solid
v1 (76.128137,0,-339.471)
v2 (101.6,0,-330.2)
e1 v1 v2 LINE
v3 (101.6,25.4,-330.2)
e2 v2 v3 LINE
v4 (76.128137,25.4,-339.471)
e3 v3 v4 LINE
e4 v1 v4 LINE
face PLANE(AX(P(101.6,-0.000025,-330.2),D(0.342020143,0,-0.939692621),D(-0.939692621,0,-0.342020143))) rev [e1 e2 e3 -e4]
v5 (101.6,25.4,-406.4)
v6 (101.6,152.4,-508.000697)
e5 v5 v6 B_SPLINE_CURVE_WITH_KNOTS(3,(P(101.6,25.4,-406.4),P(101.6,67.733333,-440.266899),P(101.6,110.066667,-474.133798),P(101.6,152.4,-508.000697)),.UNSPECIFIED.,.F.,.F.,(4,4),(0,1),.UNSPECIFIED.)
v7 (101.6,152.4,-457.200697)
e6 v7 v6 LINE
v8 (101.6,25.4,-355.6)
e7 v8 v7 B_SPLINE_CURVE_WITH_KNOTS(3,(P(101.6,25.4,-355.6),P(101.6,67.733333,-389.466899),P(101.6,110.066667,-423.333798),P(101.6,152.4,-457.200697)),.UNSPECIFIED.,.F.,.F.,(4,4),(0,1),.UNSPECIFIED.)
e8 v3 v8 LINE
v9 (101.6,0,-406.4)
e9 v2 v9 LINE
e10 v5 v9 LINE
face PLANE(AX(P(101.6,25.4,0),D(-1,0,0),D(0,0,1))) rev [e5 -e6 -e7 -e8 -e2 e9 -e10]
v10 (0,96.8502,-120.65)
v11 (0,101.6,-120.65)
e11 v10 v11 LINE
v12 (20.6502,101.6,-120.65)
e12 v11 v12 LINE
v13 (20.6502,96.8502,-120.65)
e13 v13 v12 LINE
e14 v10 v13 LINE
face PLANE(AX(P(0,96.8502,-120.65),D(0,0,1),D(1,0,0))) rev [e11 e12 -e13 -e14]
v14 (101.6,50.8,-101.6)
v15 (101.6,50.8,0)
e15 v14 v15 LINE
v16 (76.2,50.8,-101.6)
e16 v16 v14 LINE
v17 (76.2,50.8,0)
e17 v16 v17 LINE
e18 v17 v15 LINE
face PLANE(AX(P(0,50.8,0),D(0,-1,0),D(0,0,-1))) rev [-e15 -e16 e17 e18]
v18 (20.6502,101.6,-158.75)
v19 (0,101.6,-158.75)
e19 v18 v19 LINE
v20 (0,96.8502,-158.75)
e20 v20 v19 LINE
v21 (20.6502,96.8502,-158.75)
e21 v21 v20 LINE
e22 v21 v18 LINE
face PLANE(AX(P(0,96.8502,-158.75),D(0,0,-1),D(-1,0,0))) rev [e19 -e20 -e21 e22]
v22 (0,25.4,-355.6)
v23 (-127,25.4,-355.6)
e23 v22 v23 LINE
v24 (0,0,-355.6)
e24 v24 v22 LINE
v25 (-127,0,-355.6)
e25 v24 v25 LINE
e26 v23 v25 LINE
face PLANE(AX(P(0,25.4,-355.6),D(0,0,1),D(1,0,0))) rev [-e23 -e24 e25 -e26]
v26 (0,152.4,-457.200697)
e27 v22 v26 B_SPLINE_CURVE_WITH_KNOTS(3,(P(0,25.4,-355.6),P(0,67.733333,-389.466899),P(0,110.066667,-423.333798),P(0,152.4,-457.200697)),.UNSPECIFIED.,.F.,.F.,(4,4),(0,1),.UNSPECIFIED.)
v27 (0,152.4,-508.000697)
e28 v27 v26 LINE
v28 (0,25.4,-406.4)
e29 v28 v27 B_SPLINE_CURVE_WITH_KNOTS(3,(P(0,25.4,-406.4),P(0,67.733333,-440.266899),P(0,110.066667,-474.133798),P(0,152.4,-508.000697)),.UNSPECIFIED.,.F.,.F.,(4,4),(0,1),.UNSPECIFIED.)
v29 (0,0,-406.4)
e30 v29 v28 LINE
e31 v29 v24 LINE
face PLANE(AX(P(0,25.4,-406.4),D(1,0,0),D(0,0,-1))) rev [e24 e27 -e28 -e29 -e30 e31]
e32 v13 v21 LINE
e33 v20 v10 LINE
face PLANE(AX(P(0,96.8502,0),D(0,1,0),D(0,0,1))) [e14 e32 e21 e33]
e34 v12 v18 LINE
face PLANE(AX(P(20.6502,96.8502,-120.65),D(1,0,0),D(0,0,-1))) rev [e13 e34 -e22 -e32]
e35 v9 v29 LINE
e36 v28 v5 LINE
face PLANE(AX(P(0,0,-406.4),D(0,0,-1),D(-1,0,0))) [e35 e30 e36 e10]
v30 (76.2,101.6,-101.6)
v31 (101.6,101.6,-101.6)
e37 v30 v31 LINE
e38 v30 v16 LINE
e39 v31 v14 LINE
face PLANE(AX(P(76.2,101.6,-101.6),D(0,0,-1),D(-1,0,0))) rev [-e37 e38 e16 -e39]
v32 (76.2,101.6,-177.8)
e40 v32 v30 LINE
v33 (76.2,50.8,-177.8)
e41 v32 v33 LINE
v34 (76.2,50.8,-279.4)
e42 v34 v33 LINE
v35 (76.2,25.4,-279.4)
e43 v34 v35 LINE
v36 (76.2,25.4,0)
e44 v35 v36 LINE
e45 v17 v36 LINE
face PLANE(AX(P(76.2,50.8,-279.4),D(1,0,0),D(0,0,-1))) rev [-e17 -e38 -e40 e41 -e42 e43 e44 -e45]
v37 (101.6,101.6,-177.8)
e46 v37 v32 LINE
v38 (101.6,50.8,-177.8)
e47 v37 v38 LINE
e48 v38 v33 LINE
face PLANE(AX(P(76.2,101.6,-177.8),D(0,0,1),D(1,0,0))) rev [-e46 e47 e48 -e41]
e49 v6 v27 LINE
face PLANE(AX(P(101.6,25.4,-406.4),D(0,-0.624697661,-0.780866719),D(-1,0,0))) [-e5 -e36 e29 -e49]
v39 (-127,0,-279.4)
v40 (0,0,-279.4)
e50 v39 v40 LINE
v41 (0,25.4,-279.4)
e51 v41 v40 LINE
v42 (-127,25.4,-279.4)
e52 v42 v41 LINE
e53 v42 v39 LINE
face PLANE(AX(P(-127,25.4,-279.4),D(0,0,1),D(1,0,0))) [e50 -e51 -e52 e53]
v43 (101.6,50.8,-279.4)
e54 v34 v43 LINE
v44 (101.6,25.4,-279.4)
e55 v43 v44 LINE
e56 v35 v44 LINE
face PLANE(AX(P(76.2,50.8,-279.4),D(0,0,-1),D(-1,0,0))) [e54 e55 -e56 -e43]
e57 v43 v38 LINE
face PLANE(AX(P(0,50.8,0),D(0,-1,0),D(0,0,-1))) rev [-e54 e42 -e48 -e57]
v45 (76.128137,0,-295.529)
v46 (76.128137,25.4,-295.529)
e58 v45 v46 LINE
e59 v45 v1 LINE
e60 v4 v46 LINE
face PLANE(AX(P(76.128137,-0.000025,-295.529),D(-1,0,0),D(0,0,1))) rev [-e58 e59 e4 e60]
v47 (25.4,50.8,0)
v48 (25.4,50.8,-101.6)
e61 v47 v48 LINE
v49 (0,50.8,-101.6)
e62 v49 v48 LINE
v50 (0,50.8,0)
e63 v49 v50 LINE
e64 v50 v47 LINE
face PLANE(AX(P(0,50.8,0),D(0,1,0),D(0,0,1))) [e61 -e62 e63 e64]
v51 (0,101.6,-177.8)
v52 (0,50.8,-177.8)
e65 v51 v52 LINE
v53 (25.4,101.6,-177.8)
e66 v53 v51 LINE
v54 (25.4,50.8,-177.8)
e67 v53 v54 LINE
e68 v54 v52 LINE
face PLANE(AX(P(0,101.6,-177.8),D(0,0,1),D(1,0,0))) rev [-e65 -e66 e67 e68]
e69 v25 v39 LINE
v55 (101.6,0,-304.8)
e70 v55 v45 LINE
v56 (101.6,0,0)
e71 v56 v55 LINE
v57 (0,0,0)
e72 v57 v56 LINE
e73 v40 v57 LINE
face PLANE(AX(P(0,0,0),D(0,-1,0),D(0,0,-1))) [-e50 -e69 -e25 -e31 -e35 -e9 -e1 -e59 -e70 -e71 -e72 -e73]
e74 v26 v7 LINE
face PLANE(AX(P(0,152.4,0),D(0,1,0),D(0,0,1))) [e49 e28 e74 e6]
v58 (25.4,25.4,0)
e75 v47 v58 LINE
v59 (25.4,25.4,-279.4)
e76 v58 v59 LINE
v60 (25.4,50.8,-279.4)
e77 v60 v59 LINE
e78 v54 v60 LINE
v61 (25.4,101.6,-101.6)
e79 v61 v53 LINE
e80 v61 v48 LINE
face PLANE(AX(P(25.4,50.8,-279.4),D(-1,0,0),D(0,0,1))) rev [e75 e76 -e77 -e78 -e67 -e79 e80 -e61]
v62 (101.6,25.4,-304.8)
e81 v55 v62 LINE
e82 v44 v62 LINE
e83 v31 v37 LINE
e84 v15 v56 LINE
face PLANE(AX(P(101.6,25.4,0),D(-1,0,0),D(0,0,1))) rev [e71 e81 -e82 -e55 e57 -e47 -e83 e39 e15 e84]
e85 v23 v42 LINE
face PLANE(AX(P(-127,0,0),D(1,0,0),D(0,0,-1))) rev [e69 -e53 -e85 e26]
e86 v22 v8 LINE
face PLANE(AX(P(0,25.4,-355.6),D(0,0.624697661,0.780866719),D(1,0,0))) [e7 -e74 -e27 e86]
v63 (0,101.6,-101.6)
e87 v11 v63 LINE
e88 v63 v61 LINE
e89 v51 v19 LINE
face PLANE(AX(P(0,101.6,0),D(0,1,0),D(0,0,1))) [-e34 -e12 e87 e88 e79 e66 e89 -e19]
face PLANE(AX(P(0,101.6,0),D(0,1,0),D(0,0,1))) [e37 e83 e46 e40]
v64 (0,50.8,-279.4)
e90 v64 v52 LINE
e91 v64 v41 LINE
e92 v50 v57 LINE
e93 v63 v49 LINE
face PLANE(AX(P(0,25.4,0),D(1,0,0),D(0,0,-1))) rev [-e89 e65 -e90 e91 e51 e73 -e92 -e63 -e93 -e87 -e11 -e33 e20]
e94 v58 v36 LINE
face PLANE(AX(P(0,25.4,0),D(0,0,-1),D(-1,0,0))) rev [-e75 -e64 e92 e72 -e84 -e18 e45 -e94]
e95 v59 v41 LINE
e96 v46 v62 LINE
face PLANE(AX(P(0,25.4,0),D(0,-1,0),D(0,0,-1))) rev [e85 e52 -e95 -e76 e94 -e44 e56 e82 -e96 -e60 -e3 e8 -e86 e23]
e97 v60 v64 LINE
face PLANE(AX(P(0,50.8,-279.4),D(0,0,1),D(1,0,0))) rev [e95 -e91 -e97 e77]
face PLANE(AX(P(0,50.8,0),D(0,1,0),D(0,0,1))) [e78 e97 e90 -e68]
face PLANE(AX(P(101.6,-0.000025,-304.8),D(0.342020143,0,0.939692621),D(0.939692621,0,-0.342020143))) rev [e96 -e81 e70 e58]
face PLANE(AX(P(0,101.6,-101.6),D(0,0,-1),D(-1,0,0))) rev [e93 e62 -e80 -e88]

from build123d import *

# Parameters (mm, degrees)
SKETCH1_W           = 101.6
SKETCH1_H           = 355.6
BOSS_EXTRUDE1_DEPTH = 25.4
SKETCH2_W           = 76.2
SKETCH2_H           = 25.4
BOSS_EXTRUDE2_DEPTH = 127
SKETCH3_W           = 25.4
SKETCH3_H           = 279.4
BOSS_EXTRUDE3_DEPTH = 25.4
SKETCH5_W           = 25.4
SKETCH5_H           = 279.4
BOSS_EXTRUDE4_DEPTH = 25.4
SKETCH6_W           = 25.4
SKETCH6_H           = 76.2
BOSS_EXTRUDE5_DEPTH = 50.8
SKETCH8_W           = 25.4
SKETCH8_H           = 76.2
BOSS_EXTRUDE6_DEPTH = 50.8
SKETCH9_W           = 101.6
SKETCH9_H           = 25.4
BOSS_EXTRUDE7_DEPTH = 50.8
LOFT1_DEPTH         = 101.6
CUT_EXTRUDE2_DEPTH  = 539.816024431
SKETCH18_W          = 20.6502
SKETCH18_H          = 38.1
CUT_EXTRUDE3_DEPTH  = 4.7498


# Read off the part's stored shape, not the designer's step: Loft1
with BuildPart() as part:
    # Sketch1 → Boss-Extrude1 (new body)
    with BuildSketch(Plane(origin=(0, 0, 0), x_dir=(1, 0, 0), z_dir=(0, 1, 0))):
        with Locations((50.8, 177.8)):
            Rectangle(SKETCH1_W, SKETCH1_H)
    extrude(amount=BOSS_EXTRUDE1_DEPTH)

    # Sketch2 → Boss-Extrude2 (add)
    with BuildSketch(Plane.ZY):
        with Locations((-317.5, 12.7)):
            Rectangle(SKETCH2_W, SKETCH2_H)
    extrude(amount=BOSS_EXTRUDE2_DEPTH)

    # Sketch3 → Boss-Extrude3 (add)
    with BuildSketch(Plane(origin=(0, 25.4, 0), x_dir=(1, 0, 0), z_dir=(0, 1, 0))):
        with Locations((12.7, 139.7)):
            Rectangle(SKETCH3_W, SKETCH3_H)
    extrude(amount=BOSS_EXTRUDE3_DEPTH)

    # Sketch5 → Boss-Extrude4 (add)
    with BuildSketch(Plane(origin=(0, 25.4, 0), x_dir=(1, 0, 0), z_dir=(0, 1, 0))):
        with Locations((88.9, 139.7)):
            Rectangle(SKETCH5_W, SKETCH5_H)
    extrude(amount=BOSS_EXTRUDE4_DEPTH)

    # Sketch6 → Boss-Extrude5 (add)
    with BuildSketch(Plane(origin=(0, 50.8, 0), x_dir=(1, 0, 0), z_dir=(0, 1, 0))):
        with Locations((12.7, 139.7)):
            Rectangle(SKETCH6_W, SKETCH6_H)
    extrude(amount=BOSS_EXTRUDE5_DEPTH)

    # Sketch8 → Boss-Extrude6 (add)
    with BuildSketch(Plane(origin=(0, 50.8, 0), x_dir=(1, 0, 0), z_dir=(0, 1, 0))):
        with Locations((88.9, 139.7)):
            Rectangle(SKETCH8_W, SKETCH8_H)
    extrude(amount=BOSS_EXTRUDE6_DEPTH)

    # Sketch9 → Boss-Extrude7 (add)
    with BuildSketch(Plane(origin=(0, 0, -355.6), x_dir=(-1, 0, 0), z_dir=(0, 0, -1))):
        with Locations((-50.8, 12.7)):
            Rectangle(SKETCH9_W, SKETCH9_H)
    extrude(amount=BOSS_EXTRUDE7_DEPTH)

    # Loft1 outline → Loft1 (add)
    with BuildSketch(Plane.YZ):
        Polygon((25.4, -406.4), (152.4, -508.000697031), (152.4, -457.200697031), (25.4, -355.6), align=None)
    extrude(amount=LOFT1_DEPTH)

    # Sketch17 → Cut-Extrude2 (cut, through all)
    with BuildSketch(Plane(origin=(0, 25.4, 0), x_dir=(1, 0, 0), z_dir=(0, 1, 0))):
        Polygon((101.6, 304.8), (101.6, 330.2), (76.128136844, 339.471), (76.128136844, 295.529), align=None)
    extrude(amount=-CUT_EXTRUDE2_DEPTH, mode=Mode.SUBTRACT)

    # Sketch18 → Cut-Extrude3 (cut)
    with BuildSketch(Plane(origin=(0, 101.6, 0), x_dir=(1, 0, 0), z_dir=(0, 1, 0))):
        with Locations((10.3251, 139.7)):
            Rectangle(SKETCH18_W, SKETCH18_H)
    extrude(amount=-CUT_EXTRUDE3_DEPTH, mode=Mode.SUBTRACT)


solid = part.part
